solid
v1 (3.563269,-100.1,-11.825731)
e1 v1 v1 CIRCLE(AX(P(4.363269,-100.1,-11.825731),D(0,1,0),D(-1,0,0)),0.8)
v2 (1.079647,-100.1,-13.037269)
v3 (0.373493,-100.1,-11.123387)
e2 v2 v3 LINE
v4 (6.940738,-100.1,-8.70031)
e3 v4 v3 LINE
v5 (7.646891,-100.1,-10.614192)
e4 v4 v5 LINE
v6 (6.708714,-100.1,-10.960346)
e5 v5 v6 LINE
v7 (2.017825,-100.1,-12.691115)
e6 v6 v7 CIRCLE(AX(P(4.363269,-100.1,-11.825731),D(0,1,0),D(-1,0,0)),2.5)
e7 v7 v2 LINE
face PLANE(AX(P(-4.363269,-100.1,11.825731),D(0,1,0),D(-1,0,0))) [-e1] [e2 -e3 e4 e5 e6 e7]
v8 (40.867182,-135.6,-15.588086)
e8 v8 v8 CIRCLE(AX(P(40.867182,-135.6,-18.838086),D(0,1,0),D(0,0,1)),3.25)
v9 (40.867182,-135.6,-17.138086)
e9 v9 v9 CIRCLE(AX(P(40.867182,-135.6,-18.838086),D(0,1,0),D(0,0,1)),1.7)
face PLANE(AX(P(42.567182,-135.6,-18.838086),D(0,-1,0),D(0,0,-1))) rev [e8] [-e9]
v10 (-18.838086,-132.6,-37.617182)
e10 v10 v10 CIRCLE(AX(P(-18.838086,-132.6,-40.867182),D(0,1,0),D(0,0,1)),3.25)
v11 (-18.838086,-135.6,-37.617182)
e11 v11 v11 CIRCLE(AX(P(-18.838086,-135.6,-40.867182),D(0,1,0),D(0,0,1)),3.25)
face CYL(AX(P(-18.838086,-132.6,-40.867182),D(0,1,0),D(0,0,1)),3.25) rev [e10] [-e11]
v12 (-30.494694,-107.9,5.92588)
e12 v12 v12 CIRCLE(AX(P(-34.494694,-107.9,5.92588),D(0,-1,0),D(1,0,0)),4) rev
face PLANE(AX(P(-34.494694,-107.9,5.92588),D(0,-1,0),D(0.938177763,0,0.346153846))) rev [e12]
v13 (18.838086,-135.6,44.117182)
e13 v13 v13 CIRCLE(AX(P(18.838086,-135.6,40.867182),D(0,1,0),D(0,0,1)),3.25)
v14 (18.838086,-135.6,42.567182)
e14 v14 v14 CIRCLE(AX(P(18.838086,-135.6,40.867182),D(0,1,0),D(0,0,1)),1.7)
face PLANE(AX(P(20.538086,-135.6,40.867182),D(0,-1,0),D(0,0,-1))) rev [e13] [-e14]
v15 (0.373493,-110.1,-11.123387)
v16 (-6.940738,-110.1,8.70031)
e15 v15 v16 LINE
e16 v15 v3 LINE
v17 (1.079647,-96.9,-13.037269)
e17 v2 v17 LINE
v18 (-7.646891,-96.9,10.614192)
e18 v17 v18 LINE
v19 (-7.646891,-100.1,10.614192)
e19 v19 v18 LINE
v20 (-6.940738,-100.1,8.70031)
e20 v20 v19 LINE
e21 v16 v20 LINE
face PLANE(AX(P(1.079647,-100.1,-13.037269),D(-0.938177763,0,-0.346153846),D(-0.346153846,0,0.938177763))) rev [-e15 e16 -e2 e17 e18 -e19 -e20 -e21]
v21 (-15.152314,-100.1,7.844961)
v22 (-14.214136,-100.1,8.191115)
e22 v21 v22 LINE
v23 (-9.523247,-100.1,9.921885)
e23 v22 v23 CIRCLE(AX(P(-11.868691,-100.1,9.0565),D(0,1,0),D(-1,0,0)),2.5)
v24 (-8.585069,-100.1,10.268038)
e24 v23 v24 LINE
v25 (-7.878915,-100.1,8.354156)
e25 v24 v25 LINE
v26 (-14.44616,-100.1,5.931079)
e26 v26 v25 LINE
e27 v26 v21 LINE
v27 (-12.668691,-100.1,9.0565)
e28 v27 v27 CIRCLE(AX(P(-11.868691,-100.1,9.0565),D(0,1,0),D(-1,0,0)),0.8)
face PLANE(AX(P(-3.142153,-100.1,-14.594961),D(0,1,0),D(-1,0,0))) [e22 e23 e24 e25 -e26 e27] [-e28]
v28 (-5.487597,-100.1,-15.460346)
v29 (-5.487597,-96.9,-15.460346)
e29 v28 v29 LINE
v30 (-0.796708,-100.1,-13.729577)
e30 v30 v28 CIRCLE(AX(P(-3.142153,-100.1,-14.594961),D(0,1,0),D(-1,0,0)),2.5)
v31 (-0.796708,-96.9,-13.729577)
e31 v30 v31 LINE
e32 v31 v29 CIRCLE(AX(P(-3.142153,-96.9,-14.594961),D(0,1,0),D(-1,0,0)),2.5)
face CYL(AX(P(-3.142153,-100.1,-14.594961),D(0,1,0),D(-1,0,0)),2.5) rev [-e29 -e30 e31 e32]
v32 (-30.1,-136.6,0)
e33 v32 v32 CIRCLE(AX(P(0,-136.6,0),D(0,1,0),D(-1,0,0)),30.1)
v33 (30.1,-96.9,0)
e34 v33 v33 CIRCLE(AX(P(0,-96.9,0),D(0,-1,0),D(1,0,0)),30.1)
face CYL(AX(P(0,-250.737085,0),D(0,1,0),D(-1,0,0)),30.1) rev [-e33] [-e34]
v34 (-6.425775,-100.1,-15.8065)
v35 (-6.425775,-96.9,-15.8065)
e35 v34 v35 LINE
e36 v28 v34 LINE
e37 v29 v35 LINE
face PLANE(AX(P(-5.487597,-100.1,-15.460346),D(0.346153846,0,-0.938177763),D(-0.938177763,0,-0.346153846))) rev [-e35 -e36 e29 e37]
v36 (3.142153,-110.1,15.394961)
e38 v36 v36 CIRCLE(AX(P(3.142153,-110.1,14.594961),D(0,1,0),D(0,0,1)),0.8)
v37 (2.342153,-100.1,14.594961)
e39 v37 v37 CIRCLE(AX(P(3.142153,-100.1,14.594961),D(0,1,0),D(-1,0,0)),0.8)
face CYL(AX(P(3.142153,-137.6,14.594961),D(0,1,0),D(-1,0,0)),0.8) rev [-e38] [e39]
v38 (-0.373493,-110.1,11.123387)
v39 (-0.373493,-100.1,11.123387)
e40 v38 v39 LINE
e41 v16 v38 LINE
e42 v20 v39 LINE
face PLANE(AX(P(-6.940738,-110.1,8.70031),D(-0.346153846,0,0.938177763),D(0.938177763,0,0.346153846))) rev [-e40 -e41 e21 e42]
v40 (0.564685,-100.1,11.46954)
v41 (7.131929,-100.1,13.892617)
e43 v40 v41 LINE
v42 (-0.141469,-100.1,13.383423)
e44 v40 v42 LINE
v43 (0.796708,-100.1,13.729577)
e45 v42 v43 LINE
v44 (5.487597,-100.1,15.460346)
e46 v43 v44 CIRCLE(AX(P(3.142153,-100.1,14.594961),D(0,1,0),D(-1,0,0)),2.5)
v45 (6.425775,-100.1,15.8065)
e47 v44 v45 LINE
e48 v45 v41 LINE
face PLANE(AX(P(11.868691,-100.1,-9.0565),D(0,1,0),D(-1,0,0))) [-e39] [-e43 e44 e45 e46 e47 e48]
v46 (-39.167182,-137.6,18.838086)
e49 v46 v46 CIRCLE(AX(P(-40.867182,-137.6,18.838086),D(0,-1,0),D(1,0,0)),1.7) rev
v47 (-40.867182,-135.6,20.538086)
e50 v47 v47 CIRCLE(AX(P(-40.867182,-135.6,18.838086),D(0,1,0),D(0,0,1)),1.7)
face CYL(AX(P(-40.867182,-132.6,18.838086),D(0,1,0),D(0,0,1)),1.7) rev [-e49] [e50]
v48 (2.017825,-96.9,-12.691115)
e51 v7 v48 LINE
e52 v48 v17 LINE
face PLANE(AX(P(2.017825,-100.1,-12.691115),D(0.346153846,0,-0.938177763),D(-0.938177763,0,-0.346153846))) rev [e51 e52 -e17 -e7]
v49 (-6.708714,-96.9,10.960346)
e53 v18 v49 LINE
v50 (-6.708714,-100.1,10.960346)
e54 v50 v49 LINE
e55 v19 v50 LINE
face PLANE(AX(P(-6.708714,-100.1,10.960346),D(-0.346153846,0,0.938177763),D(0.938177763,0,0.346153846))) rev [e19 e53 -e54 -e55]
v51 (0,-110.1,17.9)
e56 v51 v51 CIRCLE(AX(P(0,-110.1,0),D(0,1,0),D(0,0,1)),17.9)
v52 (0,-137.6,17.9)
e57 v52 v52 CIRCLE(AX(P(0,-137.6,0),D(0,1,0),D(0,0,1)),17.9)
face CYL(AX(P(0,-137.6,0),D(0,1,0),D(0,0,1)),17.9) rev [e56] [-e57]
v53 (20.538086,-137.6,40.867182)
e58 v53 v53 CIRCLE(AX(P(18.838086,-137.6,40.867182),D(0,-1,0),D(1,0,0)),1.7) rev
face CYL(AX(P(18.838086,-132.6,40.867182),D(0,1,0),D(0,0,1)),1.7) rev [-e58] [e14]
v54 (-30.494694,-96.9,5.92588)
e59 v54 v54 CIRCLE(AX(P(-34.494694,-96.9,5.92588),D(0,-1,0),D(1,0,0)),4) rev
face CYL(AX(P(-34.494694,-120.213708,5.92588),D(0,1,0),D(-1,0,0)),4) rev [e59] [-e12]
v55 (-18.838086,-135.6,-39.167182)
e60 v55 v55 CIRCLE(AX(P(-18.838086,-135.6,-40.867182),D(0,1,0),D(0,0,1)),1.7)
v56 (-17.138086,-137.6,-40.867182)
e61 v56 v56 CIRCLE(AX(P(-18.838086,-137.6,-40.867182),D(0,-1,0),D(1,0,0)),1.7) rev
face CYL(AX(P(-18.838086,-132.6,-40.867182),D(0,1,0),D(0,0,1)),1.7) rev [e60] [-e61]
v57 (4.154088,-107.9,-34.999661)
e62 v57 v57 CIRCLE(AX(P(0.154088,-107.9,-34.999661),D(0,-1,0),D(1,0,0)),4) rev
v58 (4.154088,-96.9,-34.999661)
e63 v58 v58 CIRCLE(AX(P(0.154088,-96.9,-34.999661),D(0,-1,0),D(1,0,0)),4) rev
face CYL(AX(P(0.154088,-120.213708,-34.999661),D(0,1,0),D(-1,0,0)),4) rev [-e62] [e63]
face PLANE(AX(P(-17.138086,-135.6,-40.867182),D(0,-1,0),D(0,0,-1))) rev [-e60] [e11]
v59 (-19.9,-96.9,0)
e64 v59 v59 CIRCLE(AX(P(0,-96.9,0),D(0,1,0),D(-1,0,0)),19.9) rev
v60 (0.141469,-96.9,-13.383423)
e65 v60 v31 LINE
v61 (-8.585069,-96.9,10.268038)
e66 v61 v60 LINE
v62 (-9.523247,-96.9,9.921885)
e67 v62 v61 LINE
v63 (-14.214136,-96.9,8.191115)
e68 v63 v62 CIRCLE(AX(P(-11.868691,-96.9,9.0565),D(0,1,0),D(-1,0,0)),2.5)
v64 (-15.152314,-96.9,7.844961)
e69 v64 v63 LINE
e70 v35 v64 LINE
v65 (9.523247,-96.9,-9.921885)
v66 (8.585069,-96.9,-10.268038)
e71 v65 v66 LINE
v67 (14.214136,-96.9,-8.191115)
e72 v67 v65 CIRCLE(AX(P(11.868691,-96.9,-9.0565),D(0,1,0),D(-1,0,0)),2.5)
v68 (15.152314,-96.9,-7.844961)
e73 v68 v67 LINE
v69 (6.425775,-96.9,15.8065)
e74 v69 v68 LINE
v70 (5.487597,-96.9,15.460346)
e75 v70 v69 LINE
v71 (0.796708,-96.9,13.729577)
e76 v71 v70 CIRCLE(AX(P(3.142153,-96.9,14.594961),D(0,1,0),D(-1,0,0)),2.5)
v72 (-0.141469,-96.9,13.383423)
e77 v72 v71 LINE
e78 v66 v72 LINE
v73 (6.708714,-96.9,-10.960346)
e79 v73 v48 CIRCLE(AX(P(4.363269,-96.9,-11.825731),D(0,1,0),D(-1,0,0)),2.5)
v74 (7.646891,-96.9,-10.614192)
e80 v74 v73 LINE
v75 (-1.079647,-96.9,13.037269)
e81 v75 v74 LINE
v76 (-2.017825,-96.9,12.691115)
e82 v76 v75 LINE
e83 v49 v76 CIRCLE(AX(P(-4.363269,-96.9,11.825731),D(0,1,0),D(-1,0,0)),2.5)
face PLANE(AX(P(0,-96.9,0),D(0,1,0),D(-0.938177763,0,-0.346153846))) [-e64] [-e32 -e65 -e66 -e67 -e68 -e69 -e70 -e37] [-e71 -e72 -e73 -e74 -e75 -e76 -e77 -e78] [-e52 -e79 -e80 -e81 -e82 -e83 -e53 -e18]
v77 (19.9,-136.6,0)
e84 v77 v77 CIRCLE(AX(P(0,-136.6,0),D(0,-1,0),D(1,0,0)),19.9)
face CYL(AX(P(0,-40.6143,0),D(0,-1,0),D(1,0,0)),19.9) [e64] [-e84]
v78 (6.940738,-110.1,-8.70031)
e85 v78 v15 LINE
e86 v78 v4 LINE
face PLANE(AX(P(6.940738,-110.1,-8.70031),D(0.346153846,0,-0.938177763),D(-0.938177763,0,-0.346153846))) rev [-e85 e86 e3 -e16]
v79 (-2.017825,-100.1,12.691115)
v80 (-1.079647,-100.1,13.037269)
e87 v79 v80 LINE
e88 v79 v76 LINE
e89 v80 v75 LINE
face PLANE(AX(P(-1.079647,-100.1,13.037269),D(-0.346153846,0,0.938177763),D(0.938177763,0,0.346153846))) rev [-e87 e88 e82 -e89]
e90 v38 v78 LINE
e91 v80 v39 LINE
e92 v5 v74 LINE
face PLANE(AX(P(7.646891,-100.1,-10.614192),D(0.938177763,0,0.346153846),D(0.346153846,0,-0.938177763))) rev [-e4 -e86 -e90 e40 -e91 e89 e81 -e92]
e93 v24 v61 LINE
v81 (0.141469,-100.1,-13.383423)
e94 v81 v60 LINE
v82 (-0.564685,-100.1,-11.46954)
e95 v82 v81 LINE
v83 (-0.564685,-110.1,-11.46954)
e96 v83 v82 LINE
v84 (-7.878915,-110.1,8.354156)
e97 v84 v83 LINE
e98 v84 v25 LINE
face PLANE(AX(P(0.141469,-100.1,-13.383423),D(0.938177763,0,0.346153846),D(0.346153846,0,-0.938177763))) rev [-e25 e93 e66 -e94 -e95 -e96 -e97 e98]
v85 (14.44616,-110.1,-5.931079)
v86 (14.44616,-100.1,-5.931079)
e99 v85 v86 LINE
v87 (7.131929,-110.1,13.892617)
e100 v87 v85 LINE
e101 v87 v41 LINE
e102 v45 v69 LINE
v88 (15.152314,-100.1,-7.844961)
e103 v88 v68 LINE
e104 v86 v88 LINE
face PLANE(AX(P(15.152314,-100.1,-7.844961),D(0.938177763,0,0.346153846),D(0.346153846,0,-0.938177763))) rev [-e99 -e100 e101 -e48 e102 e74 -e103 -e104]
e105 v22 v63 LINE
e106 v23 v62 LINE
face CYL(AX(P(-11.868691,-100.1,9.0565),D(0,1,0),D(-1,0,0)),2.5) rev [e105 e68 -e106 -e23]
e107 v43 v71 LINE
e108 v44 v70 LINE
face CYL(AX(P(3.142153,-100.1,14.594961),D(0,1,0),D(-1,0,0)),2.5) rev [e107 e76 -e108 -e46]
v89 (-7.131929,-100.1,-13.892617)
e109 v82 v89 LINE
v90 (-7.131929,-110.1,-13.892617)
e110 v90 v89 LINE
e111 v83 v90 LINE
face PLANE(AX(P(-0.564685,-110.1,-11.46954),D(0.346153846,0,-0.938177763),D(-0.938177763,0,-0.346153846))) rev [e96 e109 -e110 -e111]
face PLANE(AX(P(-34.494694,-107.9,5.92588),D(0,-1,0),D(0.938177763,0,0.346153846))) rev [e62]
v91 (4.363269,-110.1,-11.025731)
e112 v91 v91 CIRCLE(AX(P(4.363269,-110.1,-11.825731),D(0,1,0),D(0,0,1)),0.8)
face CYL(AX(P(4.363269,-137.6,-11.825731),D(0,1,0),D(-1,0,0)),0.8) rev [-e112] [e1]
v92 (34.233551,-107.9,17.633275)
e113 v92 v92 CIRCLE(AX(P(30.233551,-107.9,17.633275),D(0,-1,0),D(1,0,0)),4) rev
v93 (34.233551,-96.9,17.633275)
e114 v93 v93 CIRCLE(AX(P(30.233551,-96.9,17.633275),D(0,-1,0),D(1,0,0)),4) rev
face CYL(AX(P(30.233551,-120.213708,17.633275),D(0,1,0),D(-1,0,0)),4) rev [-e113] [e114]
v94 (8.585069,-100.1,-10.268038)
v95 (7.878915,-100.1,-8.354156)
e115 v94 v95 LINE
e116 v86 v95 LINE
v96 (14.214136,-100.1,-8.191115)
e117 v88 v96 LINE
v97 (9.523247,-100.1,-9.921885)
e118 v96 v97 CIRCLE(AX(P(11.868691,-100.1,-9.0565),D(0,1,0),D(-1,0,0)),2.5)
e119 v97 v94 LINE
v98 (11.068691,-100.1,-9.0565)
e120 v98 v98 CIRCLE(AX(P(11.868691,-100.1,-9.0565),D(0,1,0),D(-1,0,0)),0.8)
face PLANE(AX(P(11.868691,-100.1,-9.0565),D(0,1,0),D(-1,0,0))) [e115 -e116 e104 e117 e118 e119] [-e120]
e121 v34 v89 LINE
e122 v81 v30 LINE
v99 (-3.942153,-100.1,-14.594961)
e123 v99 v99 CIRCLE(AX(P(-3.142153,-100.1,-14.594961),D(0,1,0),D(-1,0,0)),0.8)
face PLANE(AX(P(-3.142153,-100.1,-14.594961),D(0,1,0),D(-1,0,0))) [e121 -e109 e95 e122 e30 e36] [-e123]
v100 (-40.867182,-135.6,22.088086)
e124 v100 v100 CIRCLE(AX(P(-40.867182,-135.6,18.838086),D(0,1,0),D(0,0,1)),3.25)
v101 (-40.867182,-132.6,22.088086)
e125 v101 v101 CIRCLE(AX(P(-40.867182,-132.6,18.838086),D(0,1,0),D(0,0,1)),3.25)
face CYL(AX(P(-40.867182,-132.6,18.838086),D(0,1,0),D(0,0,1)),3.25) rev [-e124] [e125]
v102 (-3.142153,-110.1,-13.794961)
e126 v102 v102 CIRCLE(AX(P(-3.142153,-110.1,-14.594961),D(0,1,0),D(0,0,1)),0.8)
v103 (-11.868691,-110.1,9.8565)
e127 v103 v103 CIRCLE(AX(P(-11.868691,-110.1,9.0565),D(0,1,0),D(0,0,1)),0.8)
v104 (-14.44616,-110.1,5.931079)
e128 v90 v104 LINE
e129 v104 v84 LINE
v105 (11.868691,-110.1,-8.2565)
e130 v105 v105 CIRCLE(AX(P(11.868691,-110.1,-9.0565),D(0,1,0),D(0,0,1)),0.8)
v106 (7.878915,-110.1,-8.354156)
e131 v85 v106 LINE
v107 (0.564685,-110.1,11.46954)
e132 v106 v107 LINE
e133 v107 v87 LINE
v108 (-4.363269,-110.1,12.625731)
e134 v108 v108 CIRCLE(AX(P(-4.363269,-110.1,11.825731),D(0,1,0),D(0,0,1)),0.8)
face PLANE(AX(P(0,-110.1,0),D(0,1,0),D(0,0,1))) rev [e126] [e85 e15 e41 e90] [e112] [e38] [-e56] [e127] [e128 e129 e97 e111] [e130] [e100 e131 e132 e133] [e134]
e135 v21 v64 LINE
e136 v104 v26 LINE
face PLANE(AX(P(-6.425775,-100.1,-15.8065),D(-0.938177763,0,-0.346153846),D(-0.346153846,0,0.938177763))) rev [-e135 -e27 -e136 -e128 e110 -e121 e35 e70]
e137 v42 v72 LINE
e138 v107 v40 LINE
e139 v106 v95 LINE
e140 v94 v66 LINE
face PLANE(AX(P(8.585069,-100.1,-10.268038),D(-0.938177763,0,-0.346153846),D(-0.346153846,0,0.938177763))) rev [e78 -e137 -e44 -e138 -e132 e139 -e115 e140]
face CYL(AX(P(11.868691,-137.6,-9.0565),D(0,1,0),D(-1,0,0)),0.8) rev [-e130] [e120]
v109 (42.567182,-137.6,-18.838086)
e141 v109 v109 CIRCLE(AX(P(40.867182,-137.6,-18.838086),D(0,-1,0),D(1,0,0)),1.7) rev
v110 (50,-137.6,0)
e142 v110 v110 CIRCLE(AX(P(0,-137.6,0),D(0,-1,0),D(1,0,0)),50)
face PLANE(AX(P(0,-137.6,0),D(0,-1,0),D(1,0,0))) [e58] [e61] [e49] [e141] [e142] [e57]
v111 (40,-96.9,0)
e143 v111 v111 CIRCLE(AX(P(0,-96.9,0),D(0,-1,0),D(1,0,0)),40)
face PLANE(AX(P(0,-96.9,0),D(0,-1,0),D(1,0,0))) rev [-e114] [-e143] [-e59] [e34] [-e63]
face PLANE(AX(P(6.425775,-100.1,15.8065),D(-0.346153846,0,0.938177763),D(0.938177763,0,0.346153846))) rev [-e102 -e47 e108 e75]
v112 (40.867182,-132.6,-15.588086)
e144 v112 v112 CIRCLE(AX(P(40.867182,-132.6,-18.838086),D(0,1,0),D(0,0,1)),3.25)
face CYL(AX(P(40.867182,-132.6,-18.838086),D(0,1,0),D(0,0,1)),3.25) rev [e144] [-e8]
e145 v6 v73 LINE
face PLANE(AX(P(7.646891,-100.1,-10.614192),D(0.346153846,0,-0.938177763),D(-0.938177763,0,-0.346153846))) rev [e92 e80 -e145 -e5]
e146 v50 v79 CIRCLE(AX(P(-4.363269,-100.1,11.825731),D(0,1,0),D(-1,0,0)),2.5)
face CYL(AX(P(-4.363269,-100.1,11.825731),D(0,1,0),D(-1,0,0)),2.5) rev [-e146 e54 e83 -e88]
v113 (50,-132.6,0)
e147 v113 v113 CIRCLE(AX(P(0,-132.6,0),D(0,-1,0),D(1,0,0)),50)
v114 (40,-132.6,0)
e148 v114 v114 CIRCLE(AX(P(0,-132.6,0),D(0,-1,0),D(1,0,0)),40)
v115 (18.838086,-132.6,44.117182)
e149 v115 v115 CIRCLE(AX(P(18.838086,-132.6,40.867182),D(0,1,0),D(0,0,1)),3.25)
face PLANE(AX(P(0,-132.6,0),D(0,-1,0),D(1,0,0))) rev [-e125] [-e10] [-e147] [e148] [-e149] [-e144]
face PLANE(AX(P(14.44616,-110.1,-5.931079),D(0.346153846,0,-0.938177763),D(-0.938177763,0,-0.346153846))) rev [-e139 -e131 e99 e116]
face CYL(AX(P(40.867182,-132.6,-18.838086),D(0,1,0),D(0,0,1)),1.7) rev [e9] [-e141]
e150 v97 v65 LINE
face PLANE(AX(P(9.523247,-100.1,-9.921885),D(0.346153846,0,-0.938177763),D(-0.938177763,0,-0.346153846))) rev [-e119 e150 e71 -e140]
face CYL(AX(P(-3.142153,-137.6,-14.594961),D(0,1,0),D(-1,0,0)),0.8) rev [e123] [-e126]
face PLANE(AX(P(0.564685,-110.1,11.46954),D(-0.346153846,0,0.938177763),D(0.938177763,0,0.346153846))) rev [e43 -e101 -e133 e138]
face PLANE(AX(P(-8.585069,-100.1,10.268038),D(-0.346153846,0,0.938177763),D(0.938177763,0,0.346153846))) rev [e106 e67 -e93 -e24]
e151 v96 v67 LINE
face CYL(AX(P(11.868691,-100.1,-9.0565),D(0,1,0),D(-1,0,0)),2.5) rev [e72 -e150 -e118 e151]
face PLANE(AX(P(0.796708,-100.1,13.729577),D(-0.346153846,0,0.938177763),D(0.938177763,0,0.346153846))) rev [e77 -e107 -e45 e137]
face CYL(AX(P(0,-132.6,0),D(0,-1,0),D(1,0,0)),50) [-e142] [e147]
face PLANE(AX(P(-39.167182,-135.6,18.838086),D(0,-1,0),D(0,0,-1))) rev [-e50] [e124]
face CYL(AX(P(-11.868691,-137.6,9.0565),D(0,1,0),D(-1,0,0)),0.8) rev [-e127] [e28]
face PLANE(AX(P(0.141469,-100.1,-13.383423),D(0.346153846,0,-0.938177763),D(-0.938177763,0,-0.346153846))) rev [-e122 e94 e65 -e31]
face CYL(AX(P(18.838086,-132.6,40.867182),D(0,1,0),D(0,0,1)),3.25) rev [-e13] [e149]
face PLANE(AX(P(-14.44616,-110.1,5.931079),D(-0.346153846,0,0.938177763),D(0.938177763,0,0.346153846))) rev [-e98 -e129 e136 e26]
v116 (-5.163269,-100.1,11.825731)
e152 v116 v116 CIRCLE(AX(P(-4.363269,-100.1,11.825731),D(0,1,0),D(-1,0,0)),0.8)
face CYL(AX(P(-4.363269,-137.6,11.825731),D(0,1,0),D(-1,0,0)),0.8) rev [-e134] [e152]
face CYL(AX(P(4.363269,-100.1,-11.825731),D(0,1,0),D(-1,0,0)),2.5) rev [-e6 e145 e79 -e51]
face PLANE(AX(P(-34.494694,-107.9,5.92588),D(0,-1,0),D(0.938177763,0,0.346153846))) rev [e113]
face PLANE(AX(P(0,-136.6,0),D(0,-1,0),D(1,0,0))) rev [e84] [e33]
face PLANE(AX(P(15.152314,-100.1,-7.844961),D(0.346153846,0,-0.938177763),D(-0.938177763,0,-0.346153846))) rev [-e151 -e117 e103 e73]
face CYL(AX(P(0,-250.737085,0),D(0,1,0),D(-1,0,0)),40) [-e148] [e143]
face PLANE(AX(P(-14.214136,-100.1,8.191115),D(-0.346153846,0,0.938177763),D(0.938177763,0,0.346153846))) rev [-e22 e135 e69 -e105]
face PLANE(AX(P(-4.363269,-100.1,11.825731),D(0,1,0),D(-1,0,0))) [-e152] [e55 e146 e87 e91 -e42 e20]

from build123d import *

# Parameters (mm, degrees)
SKETCH1_R                      = 40
SKETCH1_R_2                    = 4.3
SKETCH1_R_3                    = 30.1
SKETCH1_R_4                    = 4
BOSS_EXTRUDE1_DEPTH            = 39.7
CUT_EXTRUDE2_OUTLINE_R         = 4
CUT_EXTRUDE2_DEPTH             = 11
SKETCH2_R                      = 40
BOSS_EXTRUDE2_DEPTH            = 1
SKETCH3_R                      = 19.9
BOSS_EXTRUDE3_DEPTH            = 40.7
CUT_EXTRUDE3_DEPTH             = 3.2
CUT_EXTRUDE4_DEPTH             = 10
SKETCH6_R                      = 17.9
CUT_EXTRUDE5_DEPTH             = 63.898728127
SKETCH7_R                      = 0.8
CUT_EXTRUDE6_DEPTH             = 68.869359802
BOSS_EXTRUDE4_START            = -5
SKETCH8_R                      = 50
SKETCH8_R_2                    = 40
BOSS_EXTRUDE4_DEPTH            = 5
CBORE_FOR_M3_SHCS1_D           = 3.4
CBORE_FOR_M3_SHCS1_DEPTH       = 5
CBORE_FOR_M3_SHCS1_CBORE_D     = 6.5
CBORE_FOR_M3_SHCS1_CBORE_DEPTH = 3
CBORE_FOR_M3_SHCS1_TIP         = 1.021463052


# Read off the part's stored shape, not the designer's step: Cut-Extrude2
with BuildPart() as part:
    # Sketch1 → Boss-Extrude1 (new body)
    # profile 1 of 7: a face of its own
    with BuildSketch(Plane.XZ.offset(96.9)):
        with Locations(Location((0, 0, 0), (0, 0, 180))):
            Circle(SKETCH1_R)
        with Locations((0.154088268, -34.99966081)):
            Circle(SKETCH1_R_2, mode=Mode.SUBTRACT)
        with Locations((-34.494694465, 5.925879997)):
            Circle(SKETCH1_R_2, mode=Mode.SUBTRACT)
        with Locations((30.233551251, 17.63327476)):
            Circle(SKETCH1_R_2, mode=Mode.SUBTRACT)
        with Locations(Location((0, 0, 0), (0, 0, 180))):
            Circle(SKETCH1_R_3, mode=Mode.SUBTRACT)
    # profile 2 of 7: a face of its own
    with BuildSketch(Plane.XZ.offset(96.9)):
        with Locations((30.233551251, 17.63327476)):
            Circle(SKETCH1_R_2)
        with Locations((30.233551251, 17.63327476)):
            Circle(SKETCH1_R_4, mode=Mode.SUBTRACT)
    # profile 3 of 7: a face of its own
    with BuildSketch(Plane.XZ.offset(96.9)):
        with Locations((30.233551251, 17.63327476)):
            Circle(SKETCH1_R_4)
    # profile 4 of 7: a face of its own
    with BuildSketch(Plane.XZ.offset(96.9)):
        with Locations((-34.494694465, 5.925879997)):
            Circle(SKETCH1_R_2)
        with Locations((-34.494694465, 5.925879997)):
            Circle(SKETCH1_R_4, mode=Mode.SUBTRACT)
    # profile 5 of 7: a face of its own
    with BuildSketch(Plane.XZ.offset(96.9)):
        with Locations((-34.494694465, 5.925879997)):
            Circle(SKETCH1_R_4)
    # profile 6 of 7: a face of its own
    with BuildSketch(Plane.XZ.offset(96.9)):
        with Locations((0.154088268, -34.99966081)):
            Circle(SKETCH1_R_2)
        with Locations((0.154088268, -34.99966081)):
            Circle(SKETCH1_R_4, mode=Mode.SUBTRACT)
    # profile 7 of 7: a face of its own
    with BuildSketch(Plane.XZ.offset(96.9)):
        with Locations((0.154088268, -34.99966081)):
            Circle(SKETCH1_R_4)
    extrude(amount=BOSS_EXTRUDE1_DEPTH)

    # Cut-Extrude2 outline → Cut-Extrude2 (cut)
    with BuildSketch(Plane.XZ.offset(96.9)):
        with Locations((30.233551251, 17.63327476)):
            Circle(CUT_EXTRUDE2_OUTLINE_R)
        with Locations((0.154088268, -34.99966081)):
            Circle(CUT_EXTRUDE2_OUTLINE_R)
        with Locations((-34.494694465, 5.925879997)):
            Circle(CUT_EXTRUDE2_OUTLINE_R)
    extrude(amount=CUT_EXTRUDE2_DEPTH, mode=Mode.SUBTRACT)

    # Sketch2 → Boss-Extrude2 (add)
    with BuildSketch(Plane.XZ.offset(136.6)):
        Circle(SKETCH2_R)
    extrude(amount=BOSS_EXTRUDE2_DEPTH)

    # Sketch3 → Boss-Extrude3 (add)
    with BuildSketch(Plane.XZ.offset(137.6)):
        Circle(SKETCH3_R)
    extrude(amount=-BOSS_EXTRUDE3_DEPTH)

    # Sketch4 → Cut-Extrude3 (cut)
    with BuildSketch(Plane(origin=(0, -96.9, 0), x_dir=(1, 0, 0), z_dir=(0, 1, 0))):
        with BuildLine():
            Line((-5.48759728, 15.460346086), (-6.425775043, 15.806499932))
            Line((-6.425775043, 15.806499932), (-15.152313504, -7.844961471))
            Line((-15.152313504, -7.844961471), (-14.214135741, -8.191115317))
            ThreePointArc((-14.214135741, -8.191115317), (-12.734075949, -11.401944339), (-9.523246927, -9.921884547))
            Line((-9.523246927, -9.921884547), (-8.585069164, -10.268038394))
            Line((-8.585069164, -10.268038394), (0.141469298, 13.383423009))
            Line((0.141469298, 13.383423009), (-0.796708465, 13.729576855))
            ThreePointArc((-0.796708465, 13.729576855), (-2.276768257, 16.940405878), (-5.48759728, 15.460346086))
        make_face()
        with BuildLine():
            Line((-6.708713638, -10.960346086), (-7.646891401, -10.61419224))
            Line((-7.646891401, -10.61419224), (1.079647061, 13.037269163))
            Line((1.079647061, 13.037269163), (2.017824824, 12.691115317))
            ThreePointArc((2.017824824, 12.691115317), (5.228653846, 14.171175109), (6.708713638, 10.960346086))
            Line((6.708713638, 10.960346086), (7.646891401, 10.61419224))
            Line((7.646891401, 10.61419224), (-1.079647061, -13.037269163))
            Line((-1.079647061, -13.037269163), (-2.017824824, -12.691115317))
            ThreePointArc((-2.017824824, -12.691115317), (-5.228653846, -14.171175109), (-6.708713638, -10.960346086))
        make_face()
        with BuildLine():
            Line((6.425775043, -15.806499932), (5.48759728, -15.460346086))
            ThreePointArc((5.48759728, -15.460346086), (2.276768257, -16.940405878), (0.796708465, -13.729576855))
            Line((0.796708465, -13.729576855), (-0.141469298, -13.383423009))
            Line((-0.141469298, -13.383423009), (8.585069164, 10.268038394))
            Line((8.585069164, 10.268038394), (9.523246927, 9.921884547))
            ThreePointArc((9.523246927, 9.921884547), (12.734075949, 11.401944339), (14.214135741, 8.191115317))
            Line((14.214135741, 8.191115317), (15.152313504, 7.844961471))
            Line((15.152313504, 7.844961471), (6.425775043, -15.806499932))
        make_face()
    extrude(amount=-CUT_EXTRUDE3_DEPTH, mode=Mode.SUBTRACT)

    # Sketch5 → Cut-Extrude4 (cut)
    with BuildSketch(Plane(origin=(0, -100.1, 0), x_dir=(1, 0, 0), z_dir=(0, 1, 0))):
        Polygon((14.446159658, 5.931078834), (7.878915318, 8.354155757), (0.564684548, -11.469540373), (7.131928889, -13.892617296), align=None)
        Polygon((-7.131928889, 13.892617296), (-14.446159658, -5.931078834), (-7.878915318, -8.354155757), (-0.564684548, 11.469540373), align=None)
        Polygon((-0.373493214, -11.123386527), (6.940737555, 8.700309603), (0.373493214, 11.123386527), (-6.940737555, -8.700309603), align=None)
    extrude(amount=-CUT_EXTRUDE4_DEPTH, mode=Mode.SUBTRACT)

    # Sketch6 → Cut-Extrude5 (cut, through all)
    with BuildSketch(Plane(origin=(0, -110.1, 0), x_dir=(1, 0, 0), z_dir=(0, 1, 0))):
        with Locations(Location((0, 0, 0), (0, 0, 270))):
            Circle(SKETCH6_R)
    extrude(amount=-CUT_EXTRUDE5_DEPTH, mode=Mode.SUBTRACT)

    # Sketch7 → Cut-Extrude6 (cut, through all)
    with BuildSketch(Plane(origin=(0, -100.1, 0), x_dir=(1, 0, 0), z_dir=(0, 1, 0))):
        with Locations(Location((3.142152872, -14.594961471, 0), (0, 0, 180))):
            Circle(SKETCH7_R)
        with Locations(Location((-4.363269231, -11.825730701, 0), (0, 0, 180))):
            Circle(SKETCH7_R)
        with Locations(Location((-11.868691334, -9.056499932, 0), (0, 0, 180))):
            Circle(SKETCH7_R)
        with Locations(Location((-3.142152872, 14.594961471, 0), (0, 0, 180))):
            Circle(SKETCH7_R)
        with Locations(Location((4.363269231, 11.825730701, 0), (0, 0, 180))):
            Circle(SKETCH7_R)
        with Locations(Location((11.868691334, 9.056499932, 0), (0, 0, 180))):
            Circle(SKETCH7_R)
    extrude(amount=-CUT_EXTRUDE6_DEPTH, mode=Mode.SUBTRACT)

    # Sketch8 → Boss-Extrude4 (add)
    with BuildSketch(Plane.XZ.offset(137.6).offset(BOSS_EXTRUDE4_START)):
        Circle(SKETCH8_R)
        Circle(SKETCH8_R_2, mode=Mode.SUBTRACT)
    extrude(amount=BOSS_EXTRUDE4_DEPTH)

    # CBORE for M3 SHCS1
    with Locations(Plane(origin=(0, -132.6, 0), x_dir=(1, 0, 0), z_dir=(0, 1, 0))):
        with Locations((-40.867181552, -18.838085677), (-18.838085677, 40.867181552), (40.867181552, 18.838085677), (18.838085677, -40.867181552)):
            CounterBoreHole(CBORE_FOR_M3_SHCS1_D / 2, CBORE_FOR_M3_SHCS1_CBORE_D / 2, CBORE_FOR_M3_SHCS1_CBORE_DEPTH, depth=CBORE_FOR_M3_SHCS1_DEPTH)
            with Locations((0, 0, -(CBORE_FOR_M3_SHCS1_DEPTH + CBORE_FOR_M3_SHCS1_TIP / 2))):  # 118° drill point
                Cone(0, CBORE_FOR_M3_SHCS1_D / 2, CBORE_FOR_M3_SHCS1_TIP, mode=Mode.SUBTRACT)


solid = part.part
